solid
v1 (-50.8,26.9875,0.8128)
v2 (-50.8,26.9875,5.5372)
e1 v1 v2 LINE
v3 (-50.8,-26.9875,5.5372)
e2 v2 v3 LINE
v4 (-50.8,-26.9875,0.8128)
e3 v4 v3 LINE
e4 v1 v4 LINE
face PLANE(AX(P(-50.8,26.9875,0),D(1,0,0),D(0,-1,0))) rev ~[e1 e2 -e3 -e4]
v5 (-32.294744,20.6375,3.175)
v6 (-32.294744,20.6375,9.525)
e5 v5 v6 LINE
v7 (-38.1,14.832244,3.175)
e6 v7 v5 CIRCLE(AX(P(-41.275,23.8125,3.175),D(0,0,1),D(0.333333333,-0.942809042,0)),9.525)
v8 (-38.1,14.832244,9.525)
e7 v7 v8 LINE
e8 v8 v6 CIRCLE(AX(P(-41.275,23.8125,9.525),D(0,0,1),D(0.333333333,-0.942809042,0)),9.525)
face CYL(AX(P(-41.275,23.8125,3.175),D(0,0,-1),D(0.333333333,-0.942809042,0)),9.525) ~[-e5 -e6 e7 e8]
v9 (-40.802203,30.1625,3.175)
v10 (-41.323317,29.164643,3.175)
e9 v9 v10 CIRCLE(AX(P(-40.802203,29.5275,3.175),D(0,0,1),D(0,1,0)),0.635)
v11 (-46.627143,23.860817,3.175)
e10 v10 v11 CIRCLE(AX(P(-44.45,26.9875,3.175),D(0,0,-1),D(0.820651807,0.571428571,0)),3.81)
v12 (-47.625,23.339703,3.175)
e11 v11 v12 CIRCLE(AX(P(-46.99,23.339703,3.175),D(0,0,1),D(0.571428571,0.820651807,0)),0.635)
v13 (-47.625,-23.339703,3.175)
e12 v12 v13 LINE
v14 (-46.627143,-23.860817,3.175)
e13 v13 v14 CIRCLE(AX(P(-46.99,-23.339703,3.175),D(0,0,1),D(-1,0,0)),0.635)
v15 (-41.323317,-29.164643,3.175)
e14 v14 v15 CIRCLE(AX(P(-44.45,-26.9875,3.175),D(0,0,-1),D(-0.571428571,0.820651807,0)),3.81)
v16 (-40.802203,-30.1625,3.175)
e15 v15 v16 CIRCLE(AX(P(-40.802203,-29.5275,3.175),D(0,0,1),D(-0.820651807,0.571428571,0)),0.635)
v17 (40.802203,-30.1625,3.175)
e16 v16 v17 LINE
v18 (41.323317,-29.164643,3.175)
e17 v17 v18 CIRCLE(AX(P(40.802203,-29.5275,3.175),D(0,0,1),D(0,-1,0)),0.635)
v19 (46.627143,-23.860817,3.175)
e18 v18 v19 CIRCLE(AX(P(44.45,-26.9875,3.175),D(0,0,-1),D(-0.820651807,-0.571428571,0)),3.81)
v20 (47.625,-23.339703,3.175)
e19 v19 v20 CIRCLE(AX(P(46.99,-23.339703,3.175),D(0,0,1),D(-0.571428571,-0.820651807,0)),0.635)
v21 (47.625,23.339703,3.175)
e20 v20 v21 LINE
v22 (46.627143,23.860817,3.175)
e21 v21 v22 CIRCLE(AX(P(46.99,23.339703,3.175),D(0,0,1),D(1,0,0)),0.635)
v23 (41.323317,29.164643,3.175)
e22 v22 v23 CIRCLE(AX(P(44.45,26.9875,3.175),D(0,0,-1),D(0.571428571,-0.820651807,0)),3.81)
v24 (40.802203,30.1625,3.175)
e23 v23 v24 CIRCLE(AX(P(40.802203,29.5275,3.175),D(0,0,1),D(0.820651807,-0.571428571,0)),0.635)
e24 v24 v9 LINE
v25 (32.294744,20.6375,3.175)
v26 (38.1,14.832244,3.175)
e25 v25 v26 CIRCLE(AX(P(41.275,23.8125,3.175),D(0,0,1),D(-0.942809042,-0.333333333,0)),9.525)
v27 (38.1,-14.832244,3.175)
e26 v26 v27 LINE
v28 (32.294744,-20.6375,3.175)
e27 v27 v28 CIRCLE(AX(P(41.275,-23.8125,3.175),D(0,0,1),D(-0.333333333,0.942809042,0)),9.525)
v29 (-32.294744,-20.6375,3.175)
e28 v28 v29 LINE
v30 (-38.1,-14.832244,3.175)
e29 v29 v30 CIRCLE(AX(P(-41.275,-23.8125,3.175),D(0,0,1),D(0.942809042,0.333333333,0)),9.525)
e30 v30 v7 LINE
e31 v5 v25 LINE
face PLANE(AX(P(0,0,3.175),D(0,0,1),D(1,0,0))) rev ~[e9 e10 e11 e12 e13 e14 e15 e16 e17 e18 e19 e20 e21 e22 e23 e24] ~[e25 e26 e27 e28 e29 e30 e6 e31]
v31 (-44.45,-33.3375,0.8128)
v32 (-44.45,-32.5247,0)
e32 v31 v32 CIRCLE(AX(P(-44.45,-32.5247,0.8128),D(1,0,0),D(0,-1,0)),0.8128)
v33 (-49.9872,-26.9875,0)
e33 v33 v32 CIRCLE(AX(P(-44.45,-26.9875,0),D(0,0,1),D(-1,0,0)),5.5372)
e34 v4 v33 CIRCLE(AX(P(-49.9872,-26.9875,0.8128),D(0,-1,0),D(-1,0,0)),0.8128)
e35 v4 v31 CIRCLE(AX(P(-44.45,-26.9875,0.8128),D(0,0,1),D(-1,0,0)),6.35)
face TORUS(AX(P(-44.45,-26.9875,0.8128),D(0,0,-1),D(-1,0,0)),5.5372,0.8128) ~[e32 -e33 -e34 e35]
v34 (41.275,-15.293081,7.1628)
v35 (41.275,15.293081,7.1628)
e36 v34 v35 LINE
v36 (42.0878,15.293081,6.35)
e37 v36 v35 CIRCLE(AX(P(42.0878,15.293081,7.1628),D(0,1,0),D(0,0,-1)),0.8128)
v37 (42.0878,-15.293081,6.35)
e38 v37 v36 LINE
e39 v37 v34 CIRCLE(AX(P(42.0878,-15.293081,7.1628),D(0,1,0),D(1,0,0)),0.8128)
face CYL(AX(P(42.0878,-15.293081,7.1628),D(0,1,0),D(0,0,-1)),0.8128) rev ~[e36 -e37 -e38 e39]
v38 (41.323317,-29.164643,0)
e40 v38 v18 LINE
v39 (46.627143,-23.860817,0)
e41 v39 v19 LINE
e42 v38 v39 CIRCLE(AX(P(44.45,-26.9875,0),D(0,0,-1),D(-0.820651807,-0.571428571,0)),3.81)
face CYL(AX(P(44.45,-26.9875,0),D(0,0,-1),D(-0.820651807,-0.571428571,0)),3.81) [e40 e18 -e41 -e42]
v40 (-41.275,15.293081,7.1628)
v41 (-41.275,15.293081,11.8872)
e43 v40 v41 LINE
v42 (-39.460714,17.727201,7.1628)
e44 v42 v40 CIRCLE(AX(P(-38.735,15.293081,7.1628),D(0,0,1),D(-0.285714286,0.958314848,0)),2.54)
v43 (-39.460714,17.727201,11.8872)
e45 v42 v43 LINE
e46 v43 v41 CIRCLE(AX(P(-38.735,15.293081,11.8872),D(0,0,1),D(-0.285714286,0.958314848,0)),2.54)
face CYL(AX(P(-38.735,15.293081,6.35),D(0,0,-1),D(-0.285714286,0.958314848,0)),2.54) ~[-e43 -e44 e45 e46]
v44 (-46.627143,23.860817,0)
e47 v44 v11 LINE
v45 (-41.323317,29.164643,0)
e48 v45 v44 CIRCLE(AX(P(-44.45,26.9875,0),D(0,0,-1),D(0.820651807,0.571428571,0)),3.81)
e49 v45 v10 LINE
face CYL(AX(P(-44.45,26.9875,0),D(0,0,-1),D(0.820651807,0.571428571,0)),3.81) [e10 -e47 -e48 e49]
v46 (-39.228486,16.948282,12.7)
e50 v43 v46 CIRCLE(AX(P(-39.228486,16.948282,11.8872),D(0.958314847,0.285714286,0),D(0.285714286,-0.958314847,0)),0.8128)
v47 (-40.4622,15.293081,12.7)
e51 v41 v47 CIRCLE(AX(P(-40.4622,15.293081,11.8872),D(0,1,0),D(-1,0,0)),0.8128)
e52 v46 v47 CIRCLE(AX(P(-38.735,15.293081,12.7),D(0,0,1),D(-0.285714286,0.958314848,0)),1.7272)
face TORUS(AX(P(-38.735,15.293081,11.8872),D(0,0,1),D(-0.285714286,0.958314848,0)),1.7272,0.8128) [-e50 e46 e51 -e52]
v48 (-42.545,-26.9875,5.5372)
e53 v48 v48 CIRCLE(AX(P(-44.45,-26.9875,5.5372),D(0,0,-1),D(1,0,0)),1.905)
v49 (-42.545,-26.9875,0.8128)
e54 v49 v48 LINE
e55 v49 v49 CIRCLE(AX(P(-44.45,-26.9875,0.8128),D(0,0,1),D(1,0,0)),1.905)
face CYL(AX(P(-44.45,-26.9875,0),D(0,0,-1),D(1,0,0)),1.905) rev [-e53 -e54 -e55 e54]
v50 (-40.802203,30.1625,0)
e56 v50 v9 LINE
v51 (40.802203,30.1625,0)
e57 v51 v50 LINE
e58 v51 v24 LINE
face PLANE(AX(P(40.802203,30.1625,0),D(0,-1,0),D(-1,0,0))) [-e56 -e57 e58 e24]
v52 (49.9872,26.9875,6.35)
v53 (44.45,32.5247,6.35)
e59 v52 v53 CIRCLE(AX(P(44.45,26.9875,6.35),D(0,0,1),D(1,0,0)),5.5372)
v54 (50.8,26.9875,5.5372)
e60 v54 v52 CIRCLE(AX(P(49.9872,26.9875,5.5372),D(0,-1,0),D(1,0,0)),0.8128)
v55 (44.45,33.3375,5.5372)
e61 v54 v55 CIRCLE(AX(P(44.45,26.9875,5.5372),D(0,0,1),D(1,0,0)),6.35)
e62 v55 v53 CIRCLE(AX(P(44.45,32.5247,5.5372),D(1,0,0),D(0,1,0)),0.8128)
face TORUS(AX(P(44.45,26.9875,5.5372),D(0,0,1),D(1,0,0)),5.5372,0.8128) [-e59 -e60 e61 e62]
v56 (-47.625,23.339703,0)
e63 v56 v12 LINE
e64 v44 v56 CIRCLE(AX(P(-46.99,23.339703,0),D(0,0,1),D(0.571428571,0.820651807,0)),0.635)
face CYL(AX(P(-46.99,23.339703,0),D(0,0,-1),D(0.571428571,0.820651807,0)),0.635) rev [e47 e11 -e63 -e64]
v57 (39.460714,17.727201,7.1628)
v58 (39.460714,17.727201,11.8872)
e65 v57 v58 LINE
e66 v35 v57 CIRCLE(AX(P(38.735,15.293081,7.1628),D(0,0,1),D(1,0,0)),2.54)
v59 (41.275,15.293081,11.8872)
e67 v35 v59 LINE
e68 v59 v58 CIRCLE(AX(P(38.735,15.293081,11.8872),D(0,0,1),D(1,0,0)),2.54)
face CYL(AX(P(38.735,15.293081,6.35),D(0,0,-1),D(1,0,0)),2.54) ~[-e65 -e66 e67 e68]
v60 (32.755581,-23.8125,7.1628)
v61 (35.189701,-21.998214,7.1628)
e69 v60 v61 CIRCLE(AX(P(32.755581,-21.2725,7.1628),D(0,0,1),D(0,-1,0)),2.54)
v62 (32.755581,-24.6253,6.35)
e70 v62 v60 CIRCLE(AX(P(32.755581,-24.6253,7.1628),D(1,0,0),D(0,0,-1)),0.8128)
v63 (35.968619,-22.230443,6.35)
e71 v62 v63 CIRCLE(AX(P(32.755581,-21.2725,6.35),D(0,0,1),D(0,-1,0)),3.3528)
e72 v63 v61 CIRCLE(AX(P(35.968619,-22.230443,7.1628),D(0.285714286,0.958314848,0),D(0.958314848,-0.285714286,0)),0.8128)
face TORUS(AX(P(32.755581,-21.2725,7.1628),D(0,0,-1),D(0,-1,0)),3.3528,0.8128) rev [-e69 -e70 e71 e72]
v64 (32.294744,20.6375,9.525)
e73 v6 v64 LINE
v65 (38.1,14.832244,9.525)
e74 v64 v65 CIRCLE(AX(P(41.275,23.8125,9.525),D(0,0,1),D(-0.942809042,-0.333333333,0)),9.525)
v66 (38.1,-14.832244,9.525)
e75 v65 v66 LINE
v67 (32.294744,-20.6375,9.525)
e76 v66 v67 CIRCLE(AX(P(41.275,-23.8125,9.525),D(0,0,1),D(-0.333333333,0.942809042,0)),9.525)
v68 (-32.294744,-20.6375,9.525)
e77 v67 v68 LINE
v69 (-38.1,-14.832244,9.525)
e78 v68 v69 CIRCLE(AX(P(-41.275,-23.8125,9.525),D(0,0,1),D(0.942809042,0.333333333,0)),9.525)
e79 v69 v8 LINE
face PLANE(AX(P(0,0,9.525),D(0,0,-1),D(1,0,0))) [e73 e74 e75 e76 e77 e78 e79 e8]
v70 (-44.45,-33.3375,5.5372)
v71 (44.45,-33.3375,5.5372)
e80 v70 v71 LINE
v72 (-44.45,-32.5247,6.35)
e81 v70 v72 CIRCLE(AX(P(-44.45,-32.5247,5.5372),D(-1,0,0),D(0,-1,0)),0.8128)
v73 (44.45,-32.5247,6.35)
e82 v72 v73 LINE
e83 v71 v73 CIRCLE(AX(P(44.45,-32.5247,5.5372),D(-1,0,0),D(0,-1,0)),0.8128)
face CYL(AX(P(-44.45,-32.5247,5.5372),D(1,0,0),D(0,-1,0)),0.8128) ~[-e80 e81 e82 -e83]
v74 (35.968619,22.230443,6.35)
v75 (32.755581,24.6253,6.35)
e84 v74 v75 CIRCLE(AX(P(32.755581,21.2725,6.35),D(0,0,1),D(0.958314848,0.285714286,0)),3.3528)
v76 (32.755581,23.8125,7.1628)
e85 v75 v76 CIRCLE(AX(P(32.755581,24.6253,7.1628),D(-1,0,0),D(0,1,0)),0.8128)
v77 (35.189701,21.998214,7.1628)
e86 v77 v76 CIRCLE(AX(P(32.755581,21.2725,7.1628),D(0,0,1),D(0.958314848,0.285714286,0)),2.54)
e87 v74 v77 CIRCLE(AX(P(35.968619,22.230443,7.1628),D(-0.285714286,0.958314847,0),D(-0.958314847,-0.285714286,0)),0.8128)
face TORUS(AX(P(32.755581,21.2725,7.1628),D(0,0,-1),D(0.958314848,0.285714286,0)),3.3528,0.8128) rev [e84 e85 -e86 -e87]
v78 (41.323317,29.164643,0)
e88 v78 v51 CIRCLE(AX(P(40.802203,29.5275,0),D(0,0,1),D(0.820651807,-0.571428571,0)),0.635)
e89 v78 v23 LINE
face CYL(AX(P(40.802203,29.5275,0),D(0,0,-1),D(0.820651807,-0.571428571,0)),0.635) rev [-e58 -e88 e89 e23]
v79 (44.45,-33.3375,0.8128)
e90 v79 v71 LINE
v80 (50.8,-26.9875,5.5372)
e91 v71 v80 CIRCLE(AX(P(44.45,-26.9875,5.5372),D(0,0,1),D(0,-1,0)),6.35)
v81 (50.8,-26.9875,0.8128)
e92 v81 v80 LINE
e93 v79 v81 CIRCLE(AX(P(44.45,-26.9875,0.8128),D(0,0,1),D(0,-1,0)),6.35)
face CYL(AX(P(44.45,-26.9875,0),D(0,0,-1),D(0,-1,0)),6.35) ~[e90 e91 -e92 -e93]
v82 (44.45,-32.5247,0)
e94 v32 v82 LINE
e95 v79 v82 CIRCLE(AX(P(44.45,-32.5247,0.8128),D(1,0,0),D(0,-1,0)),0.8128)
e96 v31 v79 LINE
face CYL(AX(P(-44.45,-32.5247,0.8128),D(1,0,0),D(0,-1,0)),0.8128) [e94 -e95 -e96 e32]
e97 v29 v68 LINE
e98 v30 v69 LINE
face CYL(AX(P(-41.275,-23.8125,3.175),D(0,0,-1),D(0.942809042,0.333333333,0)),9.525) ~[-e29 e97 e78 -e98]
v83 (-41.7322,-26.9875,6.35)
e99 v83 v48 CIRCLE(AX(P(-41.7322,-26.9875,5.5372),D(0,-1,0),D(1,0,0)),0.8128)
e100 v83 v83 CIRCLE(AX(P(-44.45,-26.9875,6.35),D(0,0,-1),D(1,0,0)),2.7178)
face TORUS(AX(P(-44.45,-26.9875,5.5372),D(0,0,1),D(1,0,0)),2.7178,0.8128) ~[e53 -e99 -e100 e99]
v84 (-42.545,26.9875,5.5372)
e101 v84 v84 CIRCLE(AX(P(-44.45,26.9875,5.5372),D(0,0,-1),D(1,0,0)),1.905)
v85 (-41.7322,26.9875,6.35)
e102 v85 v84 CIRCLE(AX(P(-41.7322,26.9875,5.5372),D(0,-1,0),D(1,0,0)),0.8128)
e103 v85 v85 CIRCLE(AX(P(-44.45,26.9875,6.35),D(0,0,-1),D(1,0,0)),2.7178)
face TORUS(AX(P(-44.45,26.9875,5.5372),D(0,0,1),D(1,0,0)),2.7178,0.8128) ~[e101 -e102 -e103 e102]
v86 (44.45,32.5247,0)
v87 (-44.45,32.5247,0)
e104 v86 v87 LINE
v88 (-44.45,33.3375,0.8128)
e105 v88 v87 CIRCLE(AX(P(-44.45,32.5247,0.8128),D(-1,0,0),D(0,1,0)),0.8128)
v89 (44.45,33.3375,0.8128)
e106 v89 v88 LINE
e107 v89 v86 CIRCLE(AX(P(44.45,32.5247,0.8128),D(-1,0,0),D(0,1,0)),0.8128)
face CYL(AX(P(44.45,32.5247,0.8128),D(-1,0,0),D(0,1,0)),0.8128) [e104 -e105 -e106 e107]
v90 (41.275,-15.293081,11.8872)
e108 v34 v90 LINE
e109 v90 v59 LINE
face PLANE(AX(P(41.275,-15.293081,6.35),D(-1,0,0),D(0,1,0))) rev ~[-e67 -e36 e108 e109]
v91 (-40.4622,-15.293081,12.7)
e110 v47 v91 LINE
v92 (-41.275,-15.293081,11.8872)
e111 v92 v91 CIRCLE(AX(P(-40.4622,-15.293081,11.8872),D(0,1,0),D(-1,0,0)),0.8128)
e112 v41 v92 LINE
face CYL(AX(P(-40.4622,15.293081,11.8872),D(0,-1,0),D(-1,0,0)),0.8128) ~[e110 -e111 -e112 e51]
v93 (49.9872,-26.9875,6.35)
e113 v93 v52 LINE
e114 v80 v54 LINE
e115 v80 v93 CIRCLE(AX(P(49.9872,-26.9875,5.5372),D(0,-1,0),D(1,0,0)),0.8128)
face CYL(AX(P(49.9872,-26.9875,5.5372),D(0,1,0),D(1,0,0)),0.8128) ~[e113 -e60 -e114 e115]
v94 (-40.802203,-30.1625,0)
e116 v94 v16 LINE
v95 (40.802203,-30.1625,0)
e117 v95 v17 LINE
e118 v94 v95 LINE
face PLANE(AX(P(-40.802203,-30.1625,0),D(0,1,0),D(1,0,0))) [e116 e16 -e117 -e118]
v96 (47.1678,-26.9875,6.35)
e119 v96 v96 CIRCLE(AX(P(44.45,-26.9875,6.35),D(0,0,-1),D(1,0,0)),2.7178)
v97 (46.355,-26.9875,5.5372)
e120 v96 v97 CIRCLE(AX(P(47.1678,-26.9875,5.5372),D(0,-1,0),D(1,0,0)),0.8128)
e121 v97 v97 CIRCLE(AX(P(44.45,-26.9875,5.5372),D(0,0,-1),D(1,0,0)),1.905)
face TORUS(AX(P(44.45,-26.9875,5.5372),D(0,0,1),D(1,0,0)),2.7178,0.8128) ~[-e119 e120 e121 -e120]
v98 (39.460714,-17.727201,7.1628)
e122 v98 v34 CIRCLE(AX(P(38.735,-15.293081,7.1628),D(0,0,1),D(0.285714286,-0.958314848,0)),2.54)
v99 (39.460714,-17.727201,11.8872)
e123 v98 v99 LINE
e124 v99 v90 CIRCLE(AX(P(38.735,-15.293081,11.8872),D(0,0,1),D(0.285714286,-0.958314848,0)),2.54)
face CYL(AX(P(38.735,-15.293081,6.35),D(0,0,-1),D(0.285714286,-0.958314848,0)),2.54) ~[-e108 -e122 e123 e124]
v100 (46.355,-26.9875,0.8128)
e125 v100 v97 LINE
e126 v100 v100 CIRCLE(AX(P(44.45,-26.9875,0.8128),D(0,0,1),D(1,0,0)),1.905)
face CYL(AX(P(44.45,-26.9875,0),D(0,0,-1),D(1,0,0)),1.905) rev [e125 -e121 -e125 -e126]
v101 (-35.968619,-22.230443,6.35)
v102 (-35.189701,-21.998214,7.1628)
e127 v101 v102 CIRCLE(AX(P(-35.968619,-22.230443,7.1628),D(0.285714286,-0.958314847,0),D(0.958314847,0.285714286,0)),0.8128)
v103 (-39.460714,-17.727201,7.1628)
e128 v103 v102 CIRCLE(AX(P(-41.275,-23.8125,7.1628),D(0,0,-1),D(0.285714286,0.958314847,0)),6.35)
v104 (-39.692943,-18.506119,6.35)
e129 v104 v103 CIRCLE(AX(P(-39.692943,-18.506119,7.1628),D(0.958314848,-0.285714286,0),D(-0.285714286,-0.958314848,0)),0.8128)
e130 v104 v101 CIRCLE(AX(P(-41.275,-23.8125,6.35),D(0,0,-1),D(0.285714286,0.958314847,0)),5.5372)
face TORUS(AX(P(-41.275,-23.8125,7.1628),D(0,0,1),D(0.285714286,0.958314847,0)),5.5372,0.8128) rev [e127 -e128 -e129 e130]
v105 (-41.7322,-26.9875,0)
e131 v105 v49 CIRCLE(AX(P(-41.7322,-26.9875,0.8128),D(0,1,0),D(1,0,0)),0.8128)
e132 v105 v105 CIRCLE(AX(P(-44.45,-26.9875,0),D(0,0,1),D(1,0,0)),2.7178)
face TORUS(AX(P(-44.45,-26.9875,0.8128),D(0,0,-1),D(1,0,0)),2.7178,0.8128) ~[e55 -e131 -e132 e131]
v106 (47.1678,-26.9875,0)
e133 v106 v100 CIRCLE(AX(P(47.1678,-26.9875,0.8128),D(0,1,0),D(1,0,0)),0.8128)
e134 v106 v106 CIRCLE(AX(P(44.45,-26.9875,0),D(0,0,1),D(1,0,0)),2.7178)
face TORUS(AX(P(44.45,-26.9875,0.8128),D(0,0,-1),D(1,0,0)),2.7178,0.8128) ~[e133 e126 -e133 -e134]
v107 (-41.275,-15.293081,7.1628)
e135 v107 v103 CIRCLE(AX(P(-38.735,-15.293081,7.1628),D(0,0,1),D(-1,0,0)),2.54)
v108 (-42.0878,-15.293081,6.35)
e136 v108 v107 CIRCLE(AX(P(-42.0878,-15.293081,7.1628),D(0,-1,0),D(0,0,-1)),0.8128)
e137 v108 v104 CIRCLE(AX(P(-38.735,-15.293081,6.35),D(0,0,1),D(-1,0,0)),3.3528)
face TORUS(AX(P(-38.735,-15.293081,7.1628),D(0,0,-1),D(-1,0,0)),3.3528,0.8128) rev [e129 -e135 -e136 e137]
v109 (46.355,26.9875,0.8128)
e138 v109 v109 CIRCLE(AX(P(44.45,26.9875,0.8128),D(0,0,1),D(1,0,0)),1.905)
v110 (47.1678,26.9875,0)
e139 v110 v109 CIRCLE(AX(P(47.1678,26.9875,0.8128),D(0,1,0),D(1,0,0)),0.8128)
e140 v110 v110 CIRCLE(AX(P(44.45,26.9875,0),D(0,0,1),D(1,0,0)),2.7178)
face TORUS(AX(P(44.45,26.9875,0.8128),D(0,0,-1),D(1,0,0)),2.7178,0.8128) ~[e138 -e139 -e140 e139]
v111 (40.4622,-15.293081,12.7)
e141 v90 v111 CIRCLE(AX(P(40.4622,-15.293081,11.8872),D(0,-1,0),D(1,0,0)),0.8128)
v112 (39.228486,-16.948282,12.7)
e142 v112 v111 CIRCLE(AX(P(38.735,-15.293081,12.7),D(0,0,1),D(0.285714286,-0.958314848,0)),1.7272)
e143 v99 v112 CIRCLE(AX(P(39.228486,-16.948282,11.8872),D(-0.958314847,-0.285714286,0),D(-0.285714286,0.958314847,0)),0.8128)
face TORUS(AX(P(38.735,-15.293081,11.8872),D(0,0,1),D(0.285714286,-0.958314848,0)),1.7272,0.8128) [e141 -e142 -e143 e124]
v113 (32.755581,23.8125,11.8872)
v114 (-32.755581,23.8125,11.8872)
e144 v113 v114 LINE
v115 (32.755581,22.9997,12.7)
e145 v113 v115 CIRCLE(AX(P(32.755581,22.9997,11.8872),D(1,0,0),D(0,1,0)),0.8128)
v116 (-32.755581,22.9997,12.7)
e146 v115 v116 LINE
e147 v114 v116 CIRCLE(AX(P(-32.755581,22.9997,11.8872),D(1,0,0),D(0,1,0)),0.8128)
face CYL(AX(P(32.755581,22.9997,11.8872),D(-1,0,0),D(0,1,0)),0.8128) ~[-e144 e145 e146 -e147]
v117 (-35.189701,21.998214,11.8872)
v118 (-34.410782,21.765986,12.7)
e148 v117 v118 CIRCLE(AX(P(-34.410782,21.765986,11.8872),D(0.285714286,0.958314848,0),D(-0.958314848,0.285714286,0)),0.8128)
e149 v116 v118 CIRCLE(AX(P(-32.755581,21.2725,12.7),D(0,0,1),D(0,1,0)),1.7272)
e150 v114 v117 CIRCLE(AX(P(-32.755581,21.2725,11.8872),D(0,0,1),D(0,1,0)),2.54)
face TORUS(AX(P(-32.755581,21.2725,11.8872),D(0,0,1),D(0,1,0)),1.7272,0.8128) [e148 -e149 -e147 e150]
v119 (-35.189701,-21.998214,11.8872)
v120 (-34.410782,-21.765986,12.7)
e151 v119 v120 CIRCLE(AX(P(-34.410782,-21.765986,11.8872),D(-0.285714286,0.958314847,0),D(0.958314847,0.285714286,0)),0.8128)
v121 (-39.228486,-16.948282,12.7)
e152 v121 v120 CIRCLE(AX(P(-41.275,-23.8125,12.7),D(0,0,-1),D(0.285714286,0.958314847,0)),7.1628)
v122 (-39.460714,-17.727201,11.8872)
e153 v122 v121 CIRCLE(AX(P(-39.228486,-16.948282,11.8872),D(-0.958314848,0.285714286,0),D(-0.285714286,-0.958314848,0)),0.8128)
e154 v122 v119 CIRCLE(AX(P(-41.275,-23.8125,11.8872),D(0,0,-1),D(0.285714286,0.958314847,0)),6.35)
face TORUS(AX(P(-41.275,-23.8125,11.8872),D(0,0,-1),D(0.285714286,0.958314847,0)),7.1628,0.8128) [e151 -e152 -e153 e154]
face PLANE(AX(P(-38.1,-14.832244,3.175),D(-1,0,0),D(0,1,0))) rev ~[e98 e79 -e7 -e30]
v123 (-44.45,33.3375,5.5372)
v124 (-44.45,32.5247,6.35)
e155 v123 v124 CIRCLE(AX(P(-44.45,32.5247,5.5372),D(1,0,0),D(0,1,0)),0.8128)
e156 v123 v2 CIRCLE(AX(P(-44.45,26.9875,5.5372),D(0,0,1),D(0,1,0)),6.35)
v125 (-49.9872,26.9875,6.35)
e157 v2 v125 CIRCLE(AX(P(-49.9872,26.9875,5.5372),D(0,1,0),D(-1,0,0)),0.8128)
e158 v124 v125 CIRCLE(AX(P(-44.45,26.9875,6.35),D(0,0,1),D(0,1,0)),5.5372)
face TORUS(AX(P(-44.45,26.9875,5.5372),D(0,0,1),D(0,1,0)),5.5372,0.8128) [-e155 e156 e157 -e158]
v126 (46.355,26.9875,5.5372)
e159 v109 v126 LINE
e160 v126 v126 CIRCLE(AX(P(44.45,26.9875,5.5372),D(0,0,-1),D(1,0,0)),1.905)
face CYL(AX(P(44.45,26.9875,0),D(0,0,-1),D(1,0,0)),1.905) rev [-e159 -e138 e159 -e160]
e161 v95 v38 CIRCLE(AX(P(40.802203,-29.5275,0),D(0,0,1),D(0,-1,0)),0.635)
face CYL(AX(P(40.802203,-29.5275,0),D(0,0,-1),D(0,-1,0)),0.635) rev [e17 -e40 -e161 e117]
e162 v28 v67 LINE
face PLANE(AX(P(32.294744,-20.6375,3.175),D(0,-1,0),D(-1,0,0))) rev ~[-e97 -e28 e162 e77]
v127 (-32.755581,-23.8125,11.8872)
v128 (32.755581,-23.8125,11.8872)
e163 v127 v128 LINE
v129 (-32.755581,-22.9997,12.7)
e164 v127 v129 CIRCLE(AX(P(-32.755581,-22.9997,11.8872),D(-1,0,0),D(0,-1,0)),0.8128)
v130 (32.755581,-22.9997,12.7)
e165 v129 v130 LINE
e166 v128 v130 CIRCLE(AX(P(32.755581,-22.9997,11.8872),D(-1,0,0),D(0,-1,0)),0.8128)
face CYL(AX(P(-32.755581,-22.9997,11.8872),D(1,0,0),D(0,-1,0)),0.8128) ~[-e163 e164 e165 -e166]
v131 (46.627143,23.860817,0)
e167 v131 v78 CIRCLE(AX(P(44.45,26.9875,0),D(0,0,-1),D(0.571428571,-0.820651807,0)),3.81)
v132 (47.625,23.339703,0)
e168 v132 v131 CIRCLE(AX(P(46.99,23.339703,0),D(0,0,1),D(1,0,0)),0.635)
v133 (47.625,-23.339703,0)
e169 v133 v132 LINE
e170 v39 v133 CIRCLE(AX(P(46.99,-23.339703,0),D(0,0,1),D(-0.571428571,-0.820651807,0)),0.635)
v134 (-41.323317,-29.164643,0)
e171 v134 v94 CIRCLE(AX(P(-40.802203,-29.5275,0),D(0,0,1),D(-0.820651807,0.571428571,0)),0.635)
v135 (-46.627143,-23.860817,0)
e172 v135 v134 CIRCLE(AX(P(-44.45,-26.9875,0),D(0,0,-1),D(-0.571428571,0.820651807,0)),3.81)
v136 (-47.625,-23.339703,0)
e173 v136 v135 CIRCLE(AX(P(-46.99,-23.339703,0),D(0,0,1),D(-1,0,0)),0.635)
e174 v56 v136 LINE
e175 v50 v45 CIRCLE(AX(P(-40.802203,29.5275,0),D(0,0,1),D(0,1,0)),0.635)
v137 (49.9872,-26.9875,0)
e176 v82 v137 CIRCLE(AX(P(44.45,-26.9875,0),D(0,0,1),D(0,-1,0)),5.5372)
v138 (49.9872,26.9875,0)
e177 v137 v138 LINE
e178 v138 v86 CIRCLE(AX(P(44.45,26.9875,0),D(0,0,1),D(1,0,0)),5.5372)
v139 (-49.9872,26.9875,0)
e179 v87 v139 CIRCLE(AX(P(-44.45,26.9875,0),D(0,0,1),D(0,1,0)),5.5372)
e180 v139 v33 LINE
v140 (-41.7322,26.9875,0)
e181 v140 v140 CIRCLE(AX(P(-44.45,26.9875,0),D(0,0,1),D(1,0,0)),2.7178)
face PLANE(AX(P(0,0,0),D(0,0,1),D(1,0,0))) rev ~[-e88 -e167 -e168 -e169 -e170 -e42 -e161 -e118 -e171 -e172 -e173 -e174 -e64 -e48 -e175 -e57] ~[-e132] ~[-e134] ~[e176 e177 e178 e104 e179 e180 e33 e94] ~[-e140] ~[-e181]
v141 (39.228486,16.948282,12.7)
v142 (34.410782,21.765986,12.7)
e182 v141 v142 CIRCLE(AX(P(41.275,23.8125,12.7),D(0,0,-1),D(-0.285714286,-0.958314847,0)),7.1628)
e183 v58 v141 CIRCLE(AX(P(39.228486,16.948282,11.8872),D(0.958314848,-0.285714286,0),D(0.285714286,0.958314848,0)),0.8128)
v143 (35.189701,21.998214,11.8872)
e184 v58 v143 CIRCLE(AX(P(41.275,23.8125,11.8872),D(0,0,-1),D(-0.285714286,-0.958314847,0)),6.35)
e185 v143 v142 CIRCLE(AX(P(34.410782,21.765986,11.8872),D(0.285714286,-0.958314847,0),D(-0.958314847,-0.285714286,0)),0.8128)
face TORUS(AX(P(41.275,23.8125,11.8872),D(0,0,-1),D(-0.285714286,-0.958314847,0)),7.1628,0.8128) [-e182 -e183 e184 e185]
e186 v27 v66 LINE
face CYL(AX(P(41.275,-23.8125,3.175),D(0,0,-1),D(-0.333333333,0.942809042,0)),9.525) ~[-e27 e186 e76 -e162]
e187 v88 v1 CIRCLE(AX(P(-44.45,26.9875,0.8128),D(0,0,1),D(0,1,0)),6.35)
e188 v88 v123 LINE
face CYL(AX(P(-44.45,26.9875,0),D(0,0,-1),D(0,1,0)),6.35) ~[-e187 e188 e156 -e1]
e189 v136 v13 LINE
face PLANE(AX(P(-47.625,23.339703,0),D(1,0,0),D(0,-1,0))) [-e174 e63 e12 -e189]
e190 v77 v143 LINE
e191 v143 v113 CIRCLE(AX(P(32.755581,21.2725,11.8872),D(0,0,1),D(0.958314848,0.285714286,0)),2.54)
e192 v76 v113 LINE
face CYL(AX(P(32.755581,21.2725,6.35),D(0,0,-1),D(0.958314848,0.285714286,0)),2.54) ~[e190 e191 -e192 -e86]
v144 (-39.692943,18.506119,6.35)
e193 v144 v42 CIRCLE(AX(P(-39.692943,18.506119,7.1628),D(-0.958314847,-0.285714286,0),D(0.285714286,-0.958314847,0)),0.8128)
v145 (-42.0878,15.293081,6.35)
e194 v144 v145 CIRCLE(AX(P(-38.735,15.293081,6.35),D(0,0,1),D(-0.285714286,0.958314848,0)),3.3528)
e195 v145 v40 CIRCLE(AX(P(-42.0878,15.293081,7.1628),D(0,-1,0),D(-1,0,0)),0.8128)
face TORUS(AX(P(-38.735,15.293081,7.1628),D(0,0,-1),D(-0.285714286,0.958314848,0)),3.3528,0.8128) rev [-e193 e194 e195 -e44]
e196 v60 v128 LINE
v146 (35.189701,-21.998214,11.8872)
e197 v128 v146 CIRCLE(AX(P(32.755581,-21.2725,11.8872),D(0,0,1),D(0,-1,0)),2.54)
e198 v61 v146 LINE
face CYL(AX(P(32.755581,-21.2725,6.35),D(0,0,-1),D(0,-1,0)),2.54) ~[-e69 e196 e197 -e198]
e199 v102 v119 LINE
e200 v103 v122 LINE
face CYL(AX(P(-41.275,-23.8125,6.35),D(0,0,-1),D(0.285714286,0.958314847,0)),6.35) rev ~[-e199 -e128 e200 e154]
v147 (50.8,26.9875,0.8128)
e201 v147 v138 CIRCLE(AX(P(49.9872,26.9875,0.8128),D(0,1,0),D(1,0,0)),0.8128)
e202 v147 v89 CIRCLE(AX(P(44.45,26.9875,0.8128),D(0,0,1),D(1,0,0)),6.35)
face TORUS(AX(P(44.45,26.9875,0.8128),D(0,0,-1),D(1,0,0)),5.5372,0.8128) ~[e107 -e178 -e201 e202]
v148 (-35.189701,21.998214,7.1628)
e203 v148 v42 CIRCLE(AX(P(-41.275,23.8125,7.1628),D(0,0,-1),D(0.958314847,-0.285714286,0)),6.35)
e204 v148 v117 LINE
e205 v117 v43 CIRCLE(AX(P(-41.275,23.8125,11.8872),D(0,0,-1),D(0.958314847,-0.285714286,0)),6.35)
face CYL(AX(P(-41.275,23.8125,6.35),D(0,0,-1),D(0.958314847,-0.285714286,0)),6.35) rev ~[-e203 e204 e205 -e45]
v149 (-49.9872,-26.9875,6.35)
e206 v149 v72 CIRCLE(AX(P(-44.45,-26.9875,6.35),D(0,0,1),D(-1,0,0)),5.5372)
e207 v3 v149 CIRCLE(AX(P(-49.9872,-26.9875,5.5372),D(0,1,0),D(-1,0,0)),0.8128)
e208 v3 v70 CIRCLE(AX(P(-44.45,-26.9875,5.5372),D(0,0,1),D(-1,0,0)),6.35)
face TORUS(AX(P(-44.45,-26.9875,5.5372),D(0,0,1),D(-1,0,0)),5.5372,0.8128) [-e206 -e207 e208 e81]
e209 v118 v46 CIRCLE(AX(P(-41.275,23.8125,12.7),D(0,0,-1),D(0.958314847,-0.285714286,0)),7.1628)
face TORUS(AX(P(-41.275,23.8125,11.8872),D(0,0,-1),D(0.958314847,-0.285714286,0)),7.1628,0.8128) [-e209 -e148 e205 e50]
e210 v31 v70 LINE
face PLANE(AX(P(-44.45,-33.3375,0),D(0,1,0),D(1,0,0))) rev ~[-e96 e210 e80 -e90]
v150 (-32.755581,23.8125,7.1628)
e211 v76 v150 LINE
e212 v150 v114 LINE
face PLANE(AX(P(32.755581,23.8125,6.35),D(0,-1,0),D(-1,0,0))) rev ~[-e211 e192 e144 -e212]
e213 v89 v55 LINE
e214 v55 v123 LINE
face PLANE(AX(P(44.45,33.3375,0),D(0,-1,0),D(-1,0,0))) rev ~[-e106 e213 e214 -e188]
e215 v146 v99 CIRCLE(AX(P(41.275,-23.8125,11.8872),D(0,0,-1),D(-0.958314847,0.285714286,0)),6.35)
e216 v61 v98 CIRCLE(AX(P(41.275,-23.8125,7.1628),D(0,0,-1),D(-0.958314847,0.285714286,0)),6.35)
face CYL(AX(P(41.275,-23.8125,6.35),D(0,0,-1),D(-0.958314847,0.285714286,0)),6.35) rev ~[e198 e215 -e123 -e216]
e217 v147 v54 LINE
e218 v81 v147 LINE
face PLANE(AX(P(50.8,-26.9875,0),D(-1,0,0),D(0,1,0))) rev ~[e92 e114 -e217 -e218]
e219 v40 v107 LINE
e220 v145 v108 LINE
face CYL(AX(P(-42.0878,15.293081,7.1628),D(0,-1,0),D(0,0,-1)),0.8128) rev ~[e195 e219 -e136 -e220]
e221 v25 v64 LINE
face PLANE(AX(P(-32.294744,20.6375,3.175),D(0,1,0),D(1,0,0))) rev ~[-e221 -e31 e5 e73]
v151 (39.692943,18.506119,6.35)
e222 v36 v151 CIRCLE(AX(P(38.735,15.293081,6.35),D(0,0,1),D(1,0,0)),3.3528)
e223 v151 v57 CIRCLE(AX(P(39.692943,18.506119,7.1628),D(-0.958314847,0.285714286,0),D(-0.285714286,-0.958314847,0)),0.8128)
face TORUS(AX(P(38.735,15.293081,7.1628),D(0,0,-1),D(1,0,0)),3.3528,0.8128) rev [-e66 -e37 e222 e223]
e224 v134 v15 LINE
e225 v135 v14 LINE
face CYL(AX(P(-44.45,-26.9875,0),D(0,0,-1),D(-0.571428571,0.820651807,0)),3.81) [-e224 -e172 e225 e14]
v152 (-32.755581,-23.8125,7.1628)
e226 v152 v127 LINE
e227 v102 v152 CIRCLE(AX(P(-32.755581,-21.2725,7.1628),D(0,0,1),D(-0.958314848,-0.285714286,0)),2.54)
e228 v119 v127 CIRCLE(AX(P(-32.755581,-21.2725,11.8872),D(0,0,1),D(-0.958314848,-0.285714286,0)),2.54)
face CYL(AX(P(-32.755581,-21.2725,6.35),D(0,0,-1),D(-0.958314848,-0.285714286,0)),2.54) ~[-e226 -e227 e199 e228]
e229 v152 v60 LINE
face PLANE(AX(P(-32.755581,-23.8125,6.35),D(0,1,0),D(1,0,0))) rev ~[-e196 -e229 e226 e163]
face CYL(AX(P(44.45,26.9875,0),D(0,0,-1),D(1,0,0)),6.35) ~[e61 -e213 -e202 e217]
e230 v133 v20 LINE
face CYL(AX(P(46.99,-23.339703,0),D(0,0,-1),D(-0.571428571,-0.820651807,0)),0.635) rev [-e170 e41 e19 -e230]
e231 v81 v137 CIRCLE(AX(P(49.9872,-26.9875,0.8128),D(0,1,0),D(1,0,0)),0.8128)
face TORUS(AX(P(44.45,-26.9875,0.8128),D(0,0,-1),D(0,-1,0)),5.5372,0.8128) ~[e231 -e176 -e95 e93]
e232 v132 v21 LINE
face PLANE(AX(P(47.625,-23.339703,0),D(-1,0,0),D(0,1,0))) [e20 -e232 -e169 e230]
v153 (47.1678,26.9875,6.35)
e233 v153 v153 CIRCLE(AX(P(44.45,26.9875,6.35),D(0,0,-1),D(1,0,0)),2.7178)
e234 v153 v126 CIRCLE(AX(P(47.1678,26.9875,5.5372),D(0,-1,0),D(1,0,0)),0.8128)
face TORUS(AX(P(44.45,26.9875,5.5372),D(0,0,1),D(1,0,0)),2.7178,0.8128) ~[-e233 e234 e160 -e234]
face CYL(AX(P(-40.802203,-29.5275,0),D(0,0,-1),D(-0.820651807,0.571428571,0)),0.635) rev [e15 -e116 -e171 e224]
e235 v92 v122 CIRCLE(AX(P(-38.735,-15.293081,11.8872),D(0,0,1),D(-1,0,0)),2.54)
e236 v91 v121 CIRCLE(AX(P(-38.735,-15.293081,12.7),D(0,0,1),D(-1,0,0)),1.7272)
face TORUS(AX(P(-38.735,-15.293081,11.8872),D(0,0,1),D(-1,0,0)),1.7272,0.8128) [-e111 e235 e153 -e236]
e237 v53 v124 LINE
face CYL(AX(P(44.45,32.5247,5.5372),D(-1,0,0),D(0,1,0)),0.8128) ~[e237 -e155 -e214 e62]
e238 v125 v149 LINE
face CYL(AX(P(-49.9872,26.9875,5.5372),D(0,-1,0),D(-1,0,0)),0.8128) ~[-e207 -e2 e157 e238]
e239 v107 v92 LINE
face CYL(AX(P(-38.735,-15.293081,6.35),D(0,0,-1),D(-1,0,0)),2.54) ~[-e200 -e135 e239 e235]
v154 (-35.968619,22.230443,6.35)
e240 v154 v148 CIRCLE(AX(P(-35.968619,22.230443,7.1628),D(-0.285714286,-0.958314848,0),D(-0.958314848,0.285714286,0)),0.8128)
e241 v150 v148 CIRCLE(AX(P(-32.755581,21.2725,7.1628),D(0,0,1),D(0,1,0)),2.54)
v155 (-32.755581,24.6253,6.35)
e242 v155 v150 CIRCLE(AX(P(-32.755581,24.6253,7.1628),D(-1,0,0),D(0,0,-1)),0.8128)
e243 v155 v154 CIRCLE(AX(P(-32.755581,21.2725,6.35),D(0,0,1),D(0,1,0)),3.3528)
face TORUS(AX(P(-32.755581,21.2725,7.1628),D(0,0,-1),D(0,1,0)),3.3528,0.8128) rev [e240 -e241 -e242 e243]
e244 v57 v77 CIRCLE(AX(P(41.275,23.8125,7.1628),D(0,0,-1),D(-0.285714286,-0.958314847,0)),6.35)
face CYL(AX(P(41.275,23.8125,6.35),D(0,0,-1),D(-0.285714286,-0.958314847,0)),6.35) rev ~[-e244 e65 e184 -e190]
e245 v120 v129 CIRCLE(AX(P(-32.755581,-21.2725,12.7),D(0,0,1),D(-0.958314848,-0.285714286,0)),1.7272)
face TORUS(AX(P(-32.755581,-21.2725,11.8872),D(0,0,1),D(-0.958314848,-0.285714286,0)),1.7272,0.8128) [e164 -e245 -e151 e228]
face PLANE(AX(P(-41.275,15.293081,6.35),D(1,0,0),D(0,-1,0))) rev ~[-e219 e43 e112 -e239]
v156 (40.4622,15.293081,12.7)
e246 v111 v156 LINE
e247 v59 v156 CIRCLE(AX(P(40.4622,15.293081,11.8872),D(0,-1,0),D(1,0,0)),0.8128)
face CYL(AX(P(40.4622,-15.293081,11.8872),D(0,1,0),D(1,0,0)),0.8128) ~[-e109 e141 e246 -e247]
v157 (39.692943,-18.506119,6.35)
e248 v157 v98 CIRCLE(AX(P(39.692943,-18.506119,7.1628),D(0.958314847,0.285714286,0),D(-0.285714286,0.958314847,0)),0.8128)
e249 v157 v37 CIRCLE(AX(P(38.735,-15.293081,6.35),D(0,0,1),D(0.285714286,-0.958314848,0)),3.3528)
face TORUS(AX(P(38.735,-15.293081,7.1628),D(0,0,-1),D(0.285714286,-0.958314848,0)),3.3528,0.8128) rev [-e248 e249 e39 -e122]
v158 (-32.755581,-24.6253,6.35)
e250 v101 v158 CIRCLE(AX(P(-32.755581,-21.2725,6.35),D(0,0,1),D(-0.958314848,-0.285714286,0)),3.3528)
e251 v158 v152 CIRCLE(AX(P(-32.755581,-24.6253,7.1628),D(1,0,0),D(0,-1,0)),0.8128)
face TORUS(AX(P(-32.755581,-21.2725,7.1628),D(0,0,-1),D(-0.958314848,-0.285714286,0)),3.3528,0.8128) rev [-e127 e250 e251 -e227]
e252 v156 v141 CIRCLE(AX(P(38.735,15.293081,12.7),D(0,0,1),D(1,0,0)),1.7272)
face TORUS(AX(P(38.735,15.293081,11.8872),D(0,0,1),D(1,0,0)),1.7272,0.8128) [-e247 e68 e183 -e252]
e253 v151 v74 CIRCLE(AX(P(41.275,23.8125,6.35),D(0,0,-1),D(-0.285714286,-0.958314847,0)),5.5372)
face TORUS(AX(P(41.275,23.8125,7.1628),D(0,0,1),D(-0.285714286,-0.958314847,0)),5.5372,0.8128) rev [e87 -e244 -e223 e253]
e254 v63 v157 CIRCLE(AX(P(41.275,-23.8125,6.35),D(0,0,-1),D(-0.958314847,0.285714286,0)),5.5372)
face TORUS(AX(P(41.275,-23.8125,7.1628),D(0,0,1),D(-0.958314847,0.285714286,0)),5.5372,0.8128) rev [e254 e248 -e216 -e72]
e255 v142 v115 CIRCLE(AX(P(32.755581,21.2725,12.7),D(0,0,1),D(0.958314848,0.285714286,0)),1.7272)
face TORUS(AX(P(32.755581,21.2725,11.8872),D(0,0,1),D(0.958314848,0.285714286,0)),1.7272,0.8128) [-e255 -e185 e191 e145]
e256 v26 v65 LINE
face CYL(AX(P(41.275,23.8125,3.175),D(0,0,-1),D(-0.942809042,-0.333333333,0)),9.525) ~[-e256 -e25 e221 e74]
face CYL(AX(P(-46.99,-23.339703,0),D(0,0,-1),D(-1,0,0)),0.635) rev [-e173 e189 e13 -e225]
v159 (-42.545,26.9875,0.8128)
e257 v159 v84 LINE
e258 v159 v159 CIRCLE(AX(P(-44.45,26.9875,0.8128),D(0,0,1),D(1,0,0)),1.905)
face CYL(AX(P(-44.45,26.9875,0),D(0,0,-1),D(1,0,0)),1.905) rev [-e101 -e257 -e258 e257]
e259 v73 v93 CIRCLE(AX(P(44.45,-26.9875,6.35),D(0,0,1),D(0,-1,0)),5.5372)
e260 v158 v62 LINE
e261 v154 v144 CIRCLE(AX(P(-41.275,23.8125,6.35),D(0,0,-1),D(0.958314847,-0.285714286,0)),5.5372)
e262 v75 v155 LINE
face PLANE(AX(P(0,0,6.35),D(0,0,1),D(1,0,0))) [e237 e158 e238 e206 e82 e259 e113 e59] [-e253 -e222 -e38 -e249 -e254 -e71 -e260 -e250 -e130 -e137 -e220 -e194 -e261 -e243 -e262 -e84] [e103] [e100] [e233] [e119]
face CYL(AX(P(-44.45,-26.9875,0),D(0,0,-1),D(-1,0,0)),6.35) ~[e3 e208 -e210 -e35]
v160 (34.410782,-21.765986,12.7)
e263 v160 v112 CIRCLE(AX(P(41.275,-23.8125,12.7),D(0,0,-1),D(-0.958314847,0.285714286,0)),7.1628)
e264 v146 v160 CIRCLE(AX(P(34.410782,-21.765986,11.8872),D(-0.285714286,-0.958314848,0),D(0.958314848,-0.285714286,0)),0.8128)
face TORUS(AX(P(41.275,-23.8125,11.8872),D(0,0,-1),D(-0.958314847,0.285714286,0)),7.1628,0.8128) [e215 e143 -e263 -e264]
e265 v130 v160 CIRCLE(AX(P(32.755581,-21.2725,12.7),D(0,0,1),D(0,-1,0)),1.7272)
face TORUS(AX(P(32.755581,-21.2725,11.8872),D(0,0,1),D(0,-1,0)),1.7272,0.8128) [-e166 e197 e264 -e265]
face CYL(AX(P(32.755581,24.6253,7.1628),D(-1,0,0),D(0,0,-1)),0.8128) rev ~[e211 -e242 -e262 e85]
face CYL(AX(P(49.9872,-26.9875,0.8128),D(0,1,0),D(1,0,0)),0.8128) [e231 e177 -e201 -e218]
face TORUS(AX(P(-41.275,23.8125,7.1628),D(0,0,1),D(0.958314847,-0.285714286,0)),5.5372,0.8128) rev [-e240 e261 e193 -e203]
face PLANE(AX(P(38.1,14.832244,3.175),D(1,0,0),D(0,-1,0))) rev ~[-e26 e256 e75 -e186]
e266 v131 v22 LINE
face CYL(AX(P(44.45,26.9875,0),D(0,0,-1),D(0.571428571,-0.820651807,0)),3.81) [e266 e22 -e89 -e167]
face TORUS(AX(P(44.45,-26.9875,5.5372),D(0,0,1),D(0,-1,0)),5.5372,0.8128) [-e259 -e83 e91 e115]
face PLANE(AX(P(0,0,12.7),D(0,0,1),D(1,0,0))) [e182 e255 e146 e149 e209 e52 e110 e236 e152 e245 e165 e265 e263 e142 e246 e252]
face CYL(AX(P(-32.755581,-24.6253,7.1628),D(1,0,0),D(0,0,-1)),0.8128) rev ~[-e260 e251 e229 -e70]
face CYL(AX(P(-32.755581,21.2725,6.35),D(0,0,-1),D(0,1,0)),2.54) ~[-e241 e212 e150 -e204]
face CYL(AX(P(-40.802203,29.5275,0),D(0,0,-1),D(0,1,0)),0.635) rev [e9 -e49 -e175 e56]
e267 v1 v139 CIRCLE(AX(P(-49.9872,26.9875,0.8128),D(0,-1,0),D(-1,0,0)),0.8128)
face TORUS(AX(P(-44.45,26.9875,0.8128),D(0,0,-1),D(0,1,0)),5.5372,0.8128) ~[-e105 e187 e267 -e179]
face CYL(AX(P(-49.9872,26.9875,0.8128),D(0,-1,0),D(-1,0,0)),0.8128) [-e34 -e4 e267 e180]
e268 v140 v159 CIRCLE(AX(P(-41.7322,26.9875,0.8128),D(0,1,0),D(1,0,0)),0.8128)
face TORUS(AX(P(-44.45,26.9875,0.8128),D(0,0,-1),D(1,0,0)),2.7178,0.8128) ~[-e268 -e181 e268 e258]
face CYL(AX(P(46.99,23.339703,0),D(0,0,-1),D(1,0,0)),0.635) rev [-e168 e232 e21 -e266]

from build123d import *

# Parameters (mm, degrees)
F1_DEPTH  = 6.35
F3_DEPTH  = 6.35
F4_R      = 1.905
F5_DEPTH  = 12.701
F6_R      = 0.8128
F8_DEPTH  = 3.175
F10_DEPTH = 6.35


with BuildPart() as f1:
    # F0 (on Top) → F1 (new body)
    with BuildSketch(Plane.XY):
        with BuildLine():
            ThreePointArc((50.8, 26.9875), (48.9401280605, 31.4776280605), (44.45, 33.3375))
            Line((44.45, 33.3375), (-44.45, 33.3375))
            ThreePointArc((-44.45, 33.3375), (-48.9401280605, 31.4776280605), (-50.8, 26.9875))
            Line((-50.8, 26.9875), (-50.8, -26.9875))
            ThreePointArc((-50.8, -26.9875), (-48.9401280605, -31.4776280605), (-44.45, -33.3375))
            Line((-44.45, -33.3375), (44.45, -33.3375))
            ThreePointArc((44.45, -33.3375), (48.9401280605, -31.4776280605), (50.8, -26.9875))
            Line((50.8, -26.9875), (50.8, 26.9875))
        make_face()
    extrude(amount=F1_DEPTH)

    # F2 (on face) → F3 (join)
    with BuildSketch(Plane.XY.offset(6.35)):
        with BuildLine():
            ThreePointArc((35.1897007184, 21.9982142857), (34.2735213396, 23.3090306634), (32.7555810057, 23.8125))
            Line((32.7555810057, 23.8125), (-32.7555810057, 23.8125))
            ThreePointArc((-32.7555810057, 23.8125), (-34.2735213396, 23.3090306634), (-35.1897007184, 21.9982142857))
            ThreePointArc((-35.1897007184, 21.9982142857), (-36.7848719395, 19.3223719395), (-39.4607142857, 17.7272007184))
            ThreePointArc((-39.4607142857, 17.7272007184), (-40.7715306634, 16.8110213396), (-41.275, 15.2930810057))
            Line((-41.275, 15.2930810057), (-41.275, -15.2930810057))
            ThreePointArc((-41.275, -15.2930810057), (-40.7715306634, -16.8110213396), (-39.4607142857, -17.7272007184))
            ThreePointArc((-39.4607142857, -17.7272007184), (-36.7848719395, -19.3223719395), (-35.1897007184, -21.9982142857))
            ThreePointArc((-35.1897007184, -21.9982142857), (-34.2735213396, -23.3090306634), (-32.7555810057, -23.8125))
            Line((-32.7555810057, -23.8125), (32.7555810057, -23.8125))
            ThreePointArc((32.7555810057, -23.8125), (34.2735213396, -23.3090306634), (35.1897007184, -21.9982142857))
            ThreePointArc((35.1897007184, -21.9982142857), (36.7848719395, -19.3223719395), (39.4607142857, -17.7272007184))
            ThreePointArc((39.4607142857, -17.7272007184), (40.7715306634, -16.8110213396), (41.275, -15.2930810057))
            Line((41.275, -15.2930810057), (41.275, 15.2930810057))
            ThreePointArc((41.275, 15.2930810057), (40.7715306634, 16.8110213396), (39.4607142857, 17.7272007184))
            ThreePointArc((39.4607142857, 17.7272007184), (36.7848719395, 19.3223719395), (35.1897007184, 21.9982142857))
        make_face()
    extrude(amount=F3_DEPTH)

    # F4 (on Top) → F5 (cut, through all)
    with BuildSketch(Plane.XY):
        with Locations((-44.45, 26.9875)):
            Circle(F4_R)
        with Locations((44.45, 26.9875)):
            Circle(F4_R)
        with Locations((44.45, -26.9875)):
            Circle(F4_R)
        with Locations((-44.45, -26.9875)):
            Circle(F4_R)
    extrude(amount=F5_DEPTH, mode=Mode.SUBTRACT)

    # F6
    f6_edges = [f1.edges().sort_by_distance(p)[0] for p in [
        (48.940128, 31.477628, 6.35),
        (50.8, 0, 6.35),
        (0, 33.3375, 6.35),
        (48.940128, -31.477628, 6.35),
        (-48.940128, 31.477628, 6.35),
        (0, -33.3375, 6.35),
        (-50.8, 0, 6.35),
        (-48.940128, -31.477628, 6.35),
        (-46.355, -26.9875, 6.35),
        (42.545, -26.9875, 6.35),
        (36.784872, 19.322372, 6.35),
        (40.771531, 16.811021, 6.35),
        (34.273521, 23.309031, 6.35),
        (41.275, 0, 6.35),
        (0, 23.8125, 6.35),
        (40.771531, -16.811021, 6.35),
        (-34.273521, 23.309031, 6.35),
        (36.784872, -19.322372, 6.35),
        (-36.784872, 19.322372, 6.35),
        (34.273521, -23.309031, 6.35),
        (-40.771531, 16.811021, 6.35),
        (0, -23.8125, 6.35),
        (-41.275, 0, 6.35),
        (-34.273521, -23.309031, 6.35),
        (-40.771531, -16.811021, 6.35),
        (-36.784872, -19.322372, 6.35),
        (-46.355, 26.9875, 6.35),
        (42.545, 26.9875, 6.35),
        (32.755581, -23.8125, 9.525),
        (35.189701, -21.998214, 9.525),
        (34.273521, -23.309031, 12.7),
        (41.275, 15.293081, 9.525),
        (39.460714, 17.727201, 9.525),
        (40.771531, 16.811021, 12.7),
        (39.460714, -17.727201, 9.525),
        (41.275, -15.293081, 9.525),
        (40.771531, -16.811021, 12.7),
        (32.755581, 23.8125, 9.525),
        (-32.755581, 23.8125, 9.525),
        (0, 23.8125, 12.7),
        (36.784872, 19.322372, 12.7),
        (34.273521, 23.309031, 12.7),
        (-34.273521, 23.309031, 12.7),
        (-36.784872, 19.322372, 12.7),
        (-40.771531, 16.811021, 12.7),
        (-41.275, 0, 12.7),
        (-40.771531, -16.811021, 12.7),
        (-36.784872, -19.322372, 12.7),
        (-34.273521, -23.309031, 12.7),
        (0, -23.8125, 12.7),
        (36.784872, -19.322372, 12.7),
        (41.275, 0, 12.7),
        (-32.755581, -23.8125, 9.525),
        (-41.275, 15.293081, 9.525),
        (-41.275, -15.293081, 9.525),
        (-39.460714, -17.727201, 9.525),
        (-35.189701, -21.998214, 9.525),
        (-39.460714, 17.727201, 9.525),
        (-35.189701, 21.998214, 9.525),
        (35.189701, 21.998214, 9.525),
        (44.45, 33.3375, 3.175),
        (-44.45, 33.3375, 3.175),
        (0, 33.3375, 0),
        (-44.45, -33.3375, 3.175),
        (44.45, -33.3375, 3.175),
        (0, -33.3375, 0),
        (50.8, -26.9875, 3.175),
        (50.8, 26.9875, 3.175),
        (50.8, 0, 0),
        (-50.8, 26.9875, 3.175),
        (-50.8, -26.9875, 3.175),
        (-50.8, 0, 0),
        (-48.940128, 31.477628, 0),
        (48.940128, 31.477628, 0),
        (48.940128, -31.477628, 0),
        (-48.940128, -31.477628, 0),
        (-46.355, -26.9875, 0),
        (42.545, -26.9875, 0),
        (-46.355, 26.9875, 0),
        (42.545, 26.9875, 0),
        (46.355, 26.9875, 3.175),
        (-42.545, -26.9875, 3.175),
        (46.355, -26.9875, 3.175),
        (-42.545, 26.9875, 3.175),
    ]]
    fillet(f6_edges, radius=F6_R)

    # F7 (on Top) → F8 (cut)
    with BuildSketch(Plane.XY):
        with BuildLine():
            Line((-40.8022027194, -30.1625), (40.8022027194, -30.1625))
            ThreePointArc((40.8022027194, -30.1625), (41.3650700598, -29.8214478817), (41.3233166167, -29.1646428571))
            ThreePointArc((41.3233166167, -29.1646428571), (41.7559231637, -24.2934231637), (46.6271428571, -23.8608166167))
            ThreePointArc((46.6271428571, -23.8608166167), (47.2839478817, -23.9025700598), (47.625, -23.3397027194))
            Line((47.625, -23.3397027194), (47.625, 23.3397027194))
            ThreePointArc((47.625, 23.3397027194), (47.2839478817, 23.9025700598), (46.6271428571, 23.8608166167))
            ThreePointArc((46.6271428571, 23.8608166167), (41.7559231637, 24.2934231637), (41.3233166167, 29.1646428571))
            ThreePointArc((41.3233166167, 29.1646428571), (41.3650700598, 29.8214478817), (40.8022027194, 30.1625))
            Line((40.8022027194, 30.1625), (-40.8022027194, 30.1625))
            ThreePointArc((-40.8022027194, 30.1625), (-41.3650700598, 29.8214478817), (-41.3233166167, 29.1646428571))
            ThreePointArc((-41.3233166167, 29.1646428571), (-41.7559231637, 24.2934231637), (-46.6271428571, 23.8608166167))
            ThreePointArc((-46.6271428571, 23.8608166167), (-47.2839478817, 23.9025700598), (-47.625, 23.3397027194))
            Line((-47.625, 23.3397027194), (-47.625, -23.3397027194))
            ThreePointArc((-47.625, -23.3397027194), (-47.2839478817, -23.9025700598), (-46.6271428571, -23.8608166167))
            ThreePointArc((-46.6271428571, -23.8608166167), (-41.7559231637, -24.2934231637), (-41.3233166167, -29.1646428571))
            ThreePointArc((-41.3233166167, -29.1646428571), (-41.3650700598, -29.8214478817), (-40.8022027194, -30.1625))
        make_face()
    extrude(amount=F8_DEPTH, mode=Mode.SUBTRACT)

    # F9 (on face) → F10 (cut, through all)
    with BuildSketch(Plane(origin=(0, 0, 3.175), x_dir=(1, 0, 0), z_dir=(0, 0, -1))):
        with BuildLine():
            Line((38.1, -14.8322438789), (38.1, 14.8322438789))
            ThreePointArc((38.1, 14.8322438789), (34.5398079092, 17.0773079092), (32.2947438789, 20.6375))
            Line((32.2947438789, 20.6375), (-32.2947438789, 20.6375))
            ThreePointArc((-32.2947438789, 20.6375), (-34.5398079092, 17.0773079092), (-38.1, 14.8322438789))
            Line((-38.1, 14.8322438789), (-38.1, -14.8322438789))
            ThreePointArc((-38.1, -14.8322438789), (-34.5398079092, -17.0773079092), (-32.2947438789, -20.6375))
            Line((-32.2947438789, -20.6375), (32.2947438789, -20.6375))
            ThreePointArc((32.2947438789, -20.6375), (34.5398079092, -17.0773079092), (38.1, -14.8322438789))
        make_face()
    extrude(amount=-F10_DEPTH, mode=Mode.SUBTRACT)


solid = f1.part
